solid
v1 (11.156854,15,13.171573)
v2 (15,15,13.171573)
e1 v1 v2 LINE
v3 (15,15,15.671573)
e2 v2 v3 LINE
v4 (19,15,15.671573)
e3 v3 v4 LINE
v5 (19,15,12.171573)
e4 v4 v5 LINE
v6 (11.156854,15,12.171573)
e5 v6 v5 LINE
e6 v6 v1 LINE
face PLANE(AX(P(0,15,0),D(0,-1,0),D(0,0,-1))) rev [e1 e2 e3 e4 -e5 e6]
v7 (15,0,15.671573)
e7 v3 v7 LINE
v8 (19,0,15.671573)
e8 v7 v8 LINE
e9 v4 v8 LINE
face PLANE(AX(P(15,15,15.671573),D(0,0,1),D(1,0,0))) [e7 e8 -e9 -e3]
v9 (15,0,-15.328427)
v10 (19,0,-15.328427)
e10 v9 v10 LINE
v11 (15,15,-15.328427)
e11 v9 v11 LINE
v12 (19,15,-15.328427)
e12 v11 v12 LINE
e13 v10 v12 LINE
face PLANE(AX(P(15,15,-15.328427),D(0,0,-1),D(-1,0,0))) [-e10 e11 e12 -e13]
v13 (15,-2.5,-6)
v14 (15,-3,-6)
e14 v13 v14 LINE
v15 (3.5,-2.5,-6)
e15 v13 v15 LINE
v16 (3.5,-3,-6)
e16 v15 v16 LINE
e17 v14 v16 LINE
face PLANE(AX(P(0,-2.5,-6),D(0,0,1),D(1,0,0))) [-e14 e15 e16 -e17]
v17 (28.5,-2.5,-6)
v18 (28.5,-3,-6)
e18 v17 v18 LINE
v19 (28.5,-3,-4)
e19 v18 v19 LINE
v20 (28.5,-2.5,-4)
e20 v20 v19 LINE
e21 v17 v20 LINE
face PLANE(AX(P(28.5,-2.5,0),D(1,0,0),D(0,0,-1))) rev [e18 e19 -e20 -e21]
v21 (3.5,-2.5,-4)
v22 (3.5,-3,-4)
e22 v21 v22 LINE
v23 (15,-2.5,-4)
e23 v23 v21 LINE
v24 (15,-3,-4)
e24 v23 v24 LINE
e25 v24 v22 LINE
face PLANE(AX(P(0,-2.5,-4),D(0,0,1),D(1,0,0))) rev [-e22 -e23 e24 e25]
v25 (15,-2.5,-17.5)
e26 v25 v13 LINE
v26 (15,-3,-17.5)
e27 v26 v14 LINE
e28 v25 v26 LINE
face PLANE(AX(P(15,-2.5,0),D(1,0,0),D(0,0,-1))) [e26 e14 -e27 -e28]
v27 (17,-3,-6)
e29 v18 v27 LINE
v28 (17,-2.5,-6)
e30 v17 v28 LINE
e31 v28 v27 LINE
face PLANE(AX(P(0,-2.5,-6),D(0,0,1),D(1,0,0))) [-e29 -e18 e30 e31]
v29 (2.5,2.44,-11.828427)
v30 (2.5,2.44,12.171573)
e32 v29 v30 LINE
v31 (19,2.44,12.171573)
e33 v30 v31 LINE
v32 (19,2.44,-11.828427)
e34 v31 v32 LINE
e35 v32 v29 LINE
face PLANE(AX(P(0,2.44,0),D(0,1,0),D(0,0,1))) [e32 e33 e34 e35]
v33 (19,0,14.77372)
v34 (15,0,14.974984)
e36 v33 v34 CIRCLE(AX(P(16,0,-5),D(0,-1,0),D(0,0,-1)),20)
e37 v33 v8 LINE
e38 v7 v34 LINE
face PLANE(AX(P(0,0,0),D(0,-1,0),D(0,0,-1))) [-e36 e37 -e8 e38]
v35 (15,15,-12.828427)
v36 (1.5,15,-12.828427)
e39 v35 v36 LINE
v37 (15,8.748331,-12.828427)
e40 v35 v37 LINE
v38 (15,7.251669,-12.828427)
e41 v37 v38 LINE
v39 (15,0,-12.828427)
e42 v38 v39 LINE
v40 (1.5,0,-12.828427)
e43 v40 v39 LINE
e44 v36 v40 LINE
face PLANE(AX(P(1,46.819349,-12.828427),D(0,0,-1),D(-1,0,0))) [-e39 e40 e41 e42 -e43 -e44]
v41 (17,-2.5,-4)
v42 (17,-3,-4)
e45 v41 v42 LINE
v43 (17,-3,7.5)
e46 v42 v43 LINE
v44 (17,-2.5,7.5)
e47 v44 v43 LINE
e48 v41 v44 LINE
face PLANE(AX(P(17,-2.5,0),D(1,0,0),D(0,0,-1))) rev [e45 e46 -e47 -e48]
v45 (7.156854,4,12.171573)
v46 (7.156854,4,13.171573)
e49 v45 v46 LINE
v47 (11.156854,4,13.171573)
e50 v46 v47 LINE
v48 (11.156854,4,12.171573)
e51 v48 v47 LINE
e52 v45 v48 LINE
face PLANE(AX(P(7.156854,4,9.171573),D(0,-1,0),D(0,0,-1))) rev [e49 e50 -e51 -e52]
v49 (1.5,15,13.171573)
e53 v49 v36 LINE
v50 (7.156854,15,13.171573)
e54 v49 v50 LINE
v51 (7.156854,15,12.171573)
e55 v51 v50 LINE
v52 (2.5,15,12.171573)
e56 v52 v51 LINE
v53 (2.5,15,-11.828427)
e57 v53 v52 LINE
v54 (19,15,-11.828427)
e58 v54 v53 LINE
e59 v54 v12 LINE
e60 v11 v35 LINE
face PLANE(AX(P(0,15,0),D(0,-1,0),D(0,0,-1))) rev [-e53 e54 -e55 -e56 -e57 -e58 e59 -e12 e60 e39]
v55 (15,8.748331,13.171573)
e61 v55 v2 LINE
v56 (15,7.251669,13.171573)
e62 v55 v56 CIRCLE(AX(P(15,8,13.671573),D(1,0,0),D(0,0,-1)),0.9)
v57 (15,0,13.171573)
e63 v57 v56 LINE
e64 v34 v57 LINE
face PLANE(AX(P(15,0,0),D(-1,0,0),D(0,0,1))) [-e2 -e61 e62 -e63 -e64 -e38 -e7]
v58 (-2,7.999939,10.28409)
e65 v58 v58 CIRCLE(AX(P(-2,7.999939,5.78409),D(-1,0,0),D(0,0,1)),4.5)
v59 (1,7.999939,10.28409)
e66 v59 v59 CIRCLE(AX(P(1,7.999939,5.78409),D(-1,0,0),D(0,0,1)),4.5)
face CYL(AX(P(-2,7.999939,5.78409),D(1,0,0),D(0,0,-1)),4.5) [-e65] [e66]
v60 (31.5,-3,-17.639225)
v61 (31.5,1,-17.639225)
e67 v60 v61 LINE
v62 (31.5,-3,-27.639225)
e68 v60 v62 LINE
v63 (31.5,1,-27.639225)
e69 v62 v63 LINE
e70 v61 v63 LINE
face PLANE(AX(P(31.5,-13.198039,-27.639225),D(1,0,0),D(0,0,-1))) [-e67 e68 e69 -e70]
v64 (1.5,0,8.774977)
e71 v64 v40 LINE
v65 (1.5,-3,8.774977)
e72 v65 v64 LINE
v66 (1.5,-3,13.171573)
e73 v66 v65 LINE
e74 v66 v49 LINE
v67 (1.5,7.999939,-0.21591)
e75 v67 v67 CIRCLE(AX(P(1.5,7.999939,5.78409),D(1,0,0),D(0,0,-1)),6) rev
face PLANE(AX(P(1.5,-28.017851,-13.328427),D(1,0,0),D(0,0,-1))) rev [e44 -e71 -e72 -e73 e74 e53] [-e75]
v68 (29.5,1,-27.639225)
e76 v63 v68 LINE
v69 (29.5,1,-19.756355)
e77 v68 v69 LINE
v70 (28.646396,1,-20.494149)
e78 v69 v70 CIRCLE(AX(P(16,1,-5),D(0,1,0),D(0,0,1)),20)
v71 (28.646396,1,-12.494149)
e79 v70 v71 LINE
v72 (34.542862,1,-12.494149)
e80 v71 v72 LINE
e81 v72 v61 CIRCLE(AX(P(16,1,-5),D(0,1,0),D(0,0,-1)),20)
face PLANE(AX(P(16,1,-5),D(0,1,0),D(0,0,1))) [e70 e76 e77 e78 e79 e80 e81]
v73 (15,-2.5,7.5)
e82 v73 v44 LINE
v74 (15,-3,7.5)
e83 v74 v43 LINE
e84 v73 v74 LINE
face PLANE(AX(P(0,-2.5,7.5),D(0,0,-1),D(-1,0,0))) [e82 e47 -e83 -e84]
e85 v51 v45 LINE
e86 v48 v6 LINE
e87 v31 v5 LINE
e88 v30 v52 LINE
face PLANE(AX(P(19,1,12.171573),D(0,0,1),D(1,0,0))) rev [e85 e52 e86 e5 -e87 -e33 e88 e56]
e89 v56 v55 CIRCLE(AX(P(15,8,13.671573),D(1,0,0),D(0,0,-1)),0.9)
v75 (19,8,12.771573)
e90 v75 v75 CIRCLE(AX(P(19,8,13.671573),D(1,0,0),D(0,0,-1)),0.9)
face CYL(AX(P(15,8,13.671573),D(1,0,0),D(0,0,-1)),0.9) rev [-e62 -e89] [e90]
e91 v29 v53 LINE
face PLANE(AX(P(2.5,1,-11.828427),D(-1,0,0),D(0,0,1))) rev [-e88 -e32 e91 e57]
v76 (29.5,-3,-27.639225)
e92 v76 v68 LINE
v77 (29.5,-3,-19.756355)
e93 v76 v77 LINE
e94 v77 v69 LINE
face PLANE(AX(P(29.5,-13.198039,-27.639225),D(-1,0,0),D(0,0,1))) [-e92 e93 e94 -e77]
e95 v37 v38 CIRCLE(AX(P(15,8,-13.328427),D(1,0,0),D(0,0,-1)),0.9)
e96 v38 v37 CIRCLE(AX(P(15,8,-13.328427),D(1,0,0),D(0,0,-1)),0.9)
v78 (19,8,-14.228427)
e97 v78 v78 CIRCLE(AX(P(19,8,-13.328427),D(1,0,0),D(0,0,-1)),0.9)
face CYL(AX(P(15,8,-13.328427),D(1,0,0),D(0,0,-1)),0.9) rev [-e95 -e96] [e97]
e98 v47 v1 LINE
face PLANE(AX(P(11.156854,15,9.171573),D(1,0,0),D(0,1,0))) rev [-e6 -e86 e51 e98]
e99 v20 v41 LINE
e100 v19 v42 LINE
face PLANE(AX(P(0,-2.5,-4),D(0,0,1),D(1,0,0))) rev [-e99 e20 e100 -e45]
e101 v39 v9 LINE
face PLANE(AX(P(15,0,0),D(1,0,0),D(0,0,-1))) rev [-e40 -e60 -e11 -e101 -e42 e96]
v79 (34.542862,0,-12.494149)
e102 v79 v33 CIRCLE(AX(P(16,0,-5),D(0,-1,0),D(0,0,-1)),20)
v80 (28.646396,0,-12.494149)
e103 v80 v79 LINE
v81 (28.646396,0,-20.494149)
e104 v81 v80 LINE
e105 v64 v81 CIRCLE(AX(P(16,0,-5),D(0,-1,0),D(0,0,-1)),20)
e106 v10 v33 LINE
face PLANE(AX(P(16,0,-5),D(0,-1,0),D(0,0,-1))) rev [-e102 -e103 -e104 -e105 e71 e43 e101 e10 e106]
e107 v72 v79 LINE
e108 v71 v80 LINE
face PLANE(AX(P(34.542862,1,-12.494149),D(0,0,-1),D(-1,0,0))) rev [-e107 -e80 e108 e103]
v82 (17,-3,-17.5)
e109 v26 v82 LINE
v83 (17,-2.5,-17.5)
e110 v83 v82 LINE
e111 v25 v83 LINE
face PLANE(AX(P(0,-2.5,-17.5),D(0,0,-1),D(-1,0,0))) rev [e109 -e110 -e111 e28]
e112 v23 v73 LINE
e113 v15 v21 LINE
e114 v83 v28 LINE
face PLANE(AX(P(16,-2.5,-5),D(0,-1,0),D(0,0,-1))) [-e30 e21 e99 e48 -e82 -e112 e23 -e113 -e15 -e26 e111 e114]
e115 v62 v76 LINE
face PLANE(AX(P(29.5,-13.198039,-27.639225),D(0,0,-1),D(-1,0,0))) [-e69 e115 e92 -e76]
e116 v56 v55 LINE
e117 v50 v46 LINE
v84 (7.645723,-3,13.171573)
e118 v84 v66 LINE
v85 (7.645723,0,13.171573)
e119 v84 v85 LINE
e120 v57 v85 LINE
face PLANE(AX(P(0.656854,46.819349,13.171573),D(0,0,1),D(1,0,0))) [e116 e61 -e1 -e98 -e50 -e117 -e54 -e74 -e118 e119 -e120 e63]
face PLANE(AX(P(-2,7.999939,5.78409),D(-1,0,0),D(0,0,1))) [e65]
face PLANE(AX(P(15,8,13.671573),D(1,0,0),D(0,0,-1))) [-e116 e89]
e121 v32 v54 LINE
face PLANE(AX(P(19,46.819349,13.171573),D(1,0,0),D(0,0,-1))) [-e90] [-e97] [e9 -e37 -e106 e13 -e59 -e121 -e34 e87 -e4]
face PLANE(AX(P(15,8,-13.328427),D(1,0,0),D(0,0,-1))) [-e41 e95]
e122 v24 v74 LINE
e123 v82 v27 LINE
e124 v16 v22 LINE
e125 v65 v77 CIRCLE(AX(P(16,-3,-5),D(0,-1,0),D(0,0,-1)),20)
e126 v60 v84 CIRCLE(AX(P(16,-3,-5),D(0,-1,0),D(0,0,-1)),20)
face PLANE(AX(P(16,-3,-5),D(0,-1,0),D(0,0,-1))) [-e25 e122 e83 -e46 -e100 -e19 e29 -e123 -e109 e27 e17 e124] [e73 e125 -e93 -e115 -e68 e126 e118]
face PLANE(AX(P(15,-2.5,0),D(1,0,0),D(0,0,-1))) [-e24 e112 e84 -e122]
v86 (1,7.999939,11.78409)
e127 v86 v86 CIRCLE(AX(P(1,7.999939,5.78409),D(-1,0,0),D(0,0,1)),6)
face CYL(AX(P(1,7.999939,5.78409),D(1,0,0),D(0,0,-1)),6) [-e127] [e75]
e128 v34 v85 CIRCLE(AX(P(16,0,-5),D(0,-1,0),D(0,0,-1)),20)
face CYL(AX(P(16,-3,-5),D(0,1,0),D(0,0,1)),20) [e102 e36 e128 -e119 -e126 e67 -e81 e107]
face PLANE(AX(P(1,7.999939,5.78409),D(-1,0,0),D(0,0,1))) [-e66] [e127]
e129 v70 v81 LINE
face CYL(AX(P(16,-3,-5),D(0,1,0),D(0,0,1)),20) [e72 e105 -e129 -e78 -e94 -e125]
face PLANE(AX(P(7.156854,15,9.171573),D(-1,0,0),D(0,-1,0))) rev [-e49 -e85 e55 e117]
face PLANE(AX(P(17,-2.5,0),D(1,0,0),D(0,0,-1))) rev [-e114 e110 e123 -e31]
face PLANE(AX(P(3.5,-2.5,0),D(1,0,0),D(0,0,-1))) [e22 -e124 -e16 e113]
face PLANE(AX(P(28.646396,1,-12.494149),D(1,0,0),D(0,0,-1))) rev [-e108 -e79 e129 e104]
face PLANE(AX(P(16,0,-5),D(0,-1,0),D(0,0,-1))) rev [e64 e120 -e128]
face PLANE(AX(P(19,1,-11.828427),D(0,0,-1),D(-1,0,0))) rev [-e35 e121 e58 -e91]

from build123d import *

# Parameters (mm, degrees)
P_IDAT_VYSUNUT_M1_DEPTH   = 15
ZAOBLIT1_R                = 7.5
SKICA6_R                  = 3.75
ODEBRAT_VYSUNUT_M4_DEPTH  = 5
SKICA7_R                  = 4.75
ODEBRAT_VYSUNUT_M5_DEPTH  = 5
P_IDAT_VYSUNUT_M2_DEPTH   = 15
SKICA10_W                 = 16.5
SKICA10_H                 = 24
ODEBRAT_VYSUNUT_M7_DEPTH  = 14
SKICA11_W                 = 2.5
SKICA11_H                 = 15
P_IDAT_VYSUNUT_M3_DEPTH   = 4
SKICA12_R                 = 0.9
ODEBRAT_VYSUNUT_M8_DEPTH  = 4
SKICA13_W                 = 4
SKICA13_H                 = 11
ODEBRAT_VYSUNUT_M9_DEPTH  = 4
SKICA15_W                 = 30.75
SKICA15_H                 = 32.5
ODEBRAT_VYSUNUT_M10_DEPTH = 30
SKICA16_R                 = 20
P_IDAT_VYSUNUT_M4_DEPTH   = 3
SKICA17_W                 = 1
SKICA17_H                 = 28
ODEBRAT_VYSUNUT_M11_DEPTH = 15
SKICA18_R                 = 6
P_IDAT_VYSUNUT_M5_DEPTH   = 0.5
SKICA19_R                 = 4.5
P_IDAT_VYSUNUT_M6_DEPTH   = 3
SKICA20_W                 = 16.5
SKICA20_H                 = 24
P_IDAT_VYSUNUT_M7_DEPTH   = 1.44
P_IDAT_VYSUNUT_M8_DEPTH   = 3
P_IDAT_START              = 1
P_IDAT_VYSUNUT_M9_DEPTH   = 1
P_IDAT_VYSUNUT_M10_DEPTH  = 3
SKICA24_R                 = 1
ODEBRAT_VYSUNUT_M12_DEPTH = 0.5
ODEBRAT_VYSUNUT_M14_DEPTH = 0.5


with BuildPart() as part:
    # Skica1 → Přidat vysunutím1 (new body)
    with BuildSketch(Plane(origin=(0, 0, 0), x_dir=(1, 0, 0), z_dir=(0, 1, 0))):
        Polygon((0, -11), (0, 11), (-3.25, 14.25), (-30.25, 14.25), (-30.25, 16.25), (-2.421572875, 16.25), (1, 12.828427125), (1, -12.828427125), (-2.421572875, -16.25), (-30.25, -16.25), (-30.25, -14.25), (-3.25, -14.25), align=None)
    extrude(amount=P_IDAT_VYSUNUT_M1_DEPTH)

    # Zaoblit1
    zaoblit1_edges = [part.edges().sort_by_distance(p)[0] for p in [
        (-30.25, 0, -15.25),
        (-30.25, 0, 15.25),
        (-30.25, 15, 15.25),
        (-30.25, 15, -15.25),
    ]]
    fillet(zaoblit1_edges, radius=ZAOBLIT1_R - 0.0001)  # a hair under: the kernel refuses the full size

    # Skica6 → Odebrat vysunutím4 (cut)
    with BuildSketch(Plane(origin=(0, 0, -16.25), x_dir=(-1, 0, 0), z_dir=(0, 0, -1))):
        with Locations((22.75, 7.5)):
            Circle(SKICA6_R)
    extrude(amount=-ODEBRAT_VYSUNUT_M4_DEPTH, mode=Mode.SUBTRACT)

    # Skica7 → Odebrat vysunutím5 (cut)
    with BuildSketch(Plane(origin=(0, 0, 14.25), x_dir=(-1, 0, 0), z_dir=(0, 0, -1))):
        with Locations((22.75, 7.5)):
            Circle(SKICA7_R)
    extrude(amount=-ODEBRAT_VYSUNUT_M5_DEPTH, mode=Mode.SUBTRACT)

    # Skica8 → Přidat vysunutím2 (add)
    with BuildSketch(Plane.XZ):
        Polygon((0.656854249, 13.171572875), (19, 13.171572875), (19, -12.828427125), (1, -12.828427125), (1, 12.828427125), align=None)
    extrude(amount=-P_IDAT_VYSUNUT_M2_DEPTH)

    # Skica10 → Odebrat vysunutím7 (cut)
    with BuildSketch(Plane(origin=(0, 15, 0), x_dir=(1, 0, 0), z_dir=(0, 1, 0))):
        with Locations((10.75, -0.171572875)):
            Rectangle(SKICA10_W, SKICA10_H)
    extrude(amount=-ODEBRAT_VYSUNUT_M7_DEPTH, mode=Mode.SUBTRACT)

    # Skica11 → Přidat vysunutím3 (add)
    with BuildSketch(Plane(origin=(19, 0, 0), x_dir=(0, 0, -1), z_dir=(1, 0, 0))):
        with Locations((-14.421572875, 7.5)):
            Rectangle(SKICA11_W, SKICA11_H)
        with Locations((14.078427125, 7.5)):
            Rectangle(SKICA11_W, SKICA11_H)
    extrude(amount=-P_IDAT_VYSUNUT_M3_DEPTH)

    # Skica12 → Odebrat vysunutím8 (cut)
    with BuildSketch(Plane(origin=(19, 0, 0), x_dir=(0, 0, -1), z_dir=(1, 0, 0))):
        with Locations((-13.671572875, 8)):
            Circle(SKICA12_R)
        with Locations((13.328427125, 8)):
            Circle(SKICA12_R)
    extrude(amount=-ODEBRAT_VYSUNUT_M8_DEPTH, mode=Mode.SUBTRACT)

    # Skica13 → Odebrat vysunutím9 (cut)
    with BuildSketch(Plane.XY.offset(13.171572875)):
        with Locations((9.156854249, 9.5)):
            Rectangle(SKICA13_W, SKICA13_H)
    extrude(amount=-ODEBRAT_VYSUNUT_M9_DEPTH, mode=Mode.SUBTRACT)

    # Skica15 → Odebrat vysunutím10 (cut)
    with BuildSketch(Plane(origin=(0, 15, 0), x_dir=(1, 0, 0), z_dir=(0, 1, 0))):
        with Locations((-14.875, 0)):
            Rectangle(SKICA15_W, SKICA15_H)
    extrude(amount=-ODEBRAT_VYSUNUT_M10_DEPTH, mode=Mode.SUBTRACT)

    # Skica16 → Přidat vysunutím4 (add)
    with BuildSketch(Plane.XZ):
        with Locations(Location((16, -5, 0), (0, 0, 92.865983983))):
            Circle(SKICA16_R)
    extrude(amount=P_IDAT_VYSUNUT_M4_DEPTH)

    # Skica17 → Odebrat vysunutím11 (cut)
    with BuildSketch(Plane(origin=(0, 15, 0), x_dir=(1, 0, 0), z_dir=(0, 1, 0))):
        with Locations((1, -0.671572875)):
            Rectangle(SKICA17_W, SKICA17_H)
    extrude(amount=-ODEBRAT_VYSUNUT_M11_DEPTH, mode=Mode.SUBTRACT)

    # Skica18 → Přidat vysunutím5 (add)
    with BuildSketch(Plane.ZY.offset(-1.5)):
        with Locations(Location((5.784090316, 7.999938585, 0), (0, 0, 180))):
            Circle(SKICA18_R)
    extrude(amount=P_IDAT_VYSUNUT_M5_DEPTH)

    # Skica19 → Přidat vysunutím6 (add)
    with BuildSketch(Plane.ZY.offset(-1)):
        with Locations((5.784090316, 7.999938585)):
            Circle(SKICA19_R)
    extrude(amount=P_IDAT_VYSUNUT_M6_DEPTH)

    # Skica20 → Přidat vysunutím7 (add)
    with BuildSketch(Plane(origin=(0, 1, 0), x_dir=(1, 0, 0), z_dir=(0, 1, 0))):
        with Locations((10.75, -0.171572875)):
            Rectangle(SKICA20_W, SKICA20_H)
    extrude(amount=P_IDAT_VYSUNUT_M7_DEPTH)

    # Skica21 → Přidat vysunutím8 (add)
    with BuildSketch(Plane(origin=(0, 0, 0), x_dir=(1, 0, 0), z_dir=(0, 1, 0))):
        with BuildLine():
            Line((29.5, 27.63922466), (31.5, 27.63922466))
            Line((31.5, 27.63922466), (31.5, 17.63922466))
            ThreePointArc((31.5, 17.63922466), (30.538588644, 18.734243344), (29.5, 19.756354563))
            Line((29.5, 19.756354563), (29.5, 27.63922466))
        make_face()
    extrude(amount=-P_IDAT_VYSUNUT_M8_DEPTH)

    # Skica22 → Přidat vysunutím9 (add)
    with BuildSketch(Plane(origin=(0, 0, 0), x_dir=(1, 0, 0), z_dir=(0, 1, 0)).offset(P_IDAT_START)):
        with BuildLine():
            Line((29.5, 27.63922466), (31.5, 27.63922466))
            Line((31.5, 27.63922466), (31.5, 17.63922466))
            ThreePointArc((31.5, 17.63922466), (33.214733837, 15.181008738), (34.542861865, 12.494149308))
            Line((34.542861865, 12.494149308), (28.646396214, 12.494149308))
            Line((28.646396214, 12.494149308), (28.646396214, 20.494149308))
            ThreePointArc((28.646396214, 20.494149308), (29.078401814, 20.131272451), (29.5, 19.756354563))
            Line((29.5, 19.756354563), (29.5, 27.63922466))
        make_face()
    extrude(amount=-P_IDAT_VYSUNUT_M9_DEPTH)

    # Skica23 → Přidat vysunutím10 (add)
    with BuildSketch(Plane.XZ):
        with BuildLine():
            Line((1.5, 8.774977314), (1.5, 13.171572875))
            Line((1.5, 13.171572875), (7.645723296, 13.171572875))
            ThreePointArc((7.645723296, 13.171572875), (4.363333637, 11.26616107), (1.5, 8.774977314))
        make_face()
    extrude(amount=P_IDAT_VYSUNUT_M10_DEPTH)

    # Skica24 → Odebrat vysunutím12 (cut)
    with BuildSketch(Plane.XZ.offset(3)):
        with Locations(Location((16, -5, 0), (0, 0, 270))):
            Circle(SKICA24_R)
    extrude(amount=-ODEBRAT_VYSUNUT_M12_DEPTH, mode=Mode.SUBTRACT)

    # Skica25 → Odebrat vysunutím14 (cut)
    with BuildSketch(Plane.XZ.offset(3)):
        Polygon((15, 7.5), (15, -4), (16, -4), (17, -4), (17, 7.5), align=None)
        Polygon((3.5, -6), (15, -6), (15, -5.000000001), (15, -4), (3.5, -4), align=None)
        Polygon((17, -5), (17, -6), (28.5, -6), (28.5, -4), (17, -4), align=None)
        Polygon((15, -6), (15, -17.5), (17, -17.5), (17, -6), (16, -6), align=None)
        with BuildLine():
            Line((15, -4), (15, -5.000000001))
            ThreePointArc((15, -5.000000001), (15.292893218, -4.292893219), (16, -4))
            Line((16, -4), (15, -4))
        make_face()
        with BuildLine():
            ThreePointArc((16, -4), (16.707106781, -4.292893219), (17, -5))
            Line((17, -5), (17, -4))
            Line((17, -4), (16, -4))
        make_face()
        with BuildLine():
            Line((16, -6), (17, -6))
            Line((17, -6), (17, -5))
            ThreePointArc((17, -5), (16.707106781, -5.707106781), (16, -6))
        make_face()
        with BuildLine():
            Line((15, -5.000000001), (15, -6))
            Line((15, -6), (16, -6))
            ThreePointArc((16, -6), (15.292893219, -5.707106782), (15, -5.000000001))
        make_face()
    extrude(amount=-ODEBRAT_VYSUNUT_M14_DEPTH, mode=Mode.SUBTRACT)


solid = part.part
